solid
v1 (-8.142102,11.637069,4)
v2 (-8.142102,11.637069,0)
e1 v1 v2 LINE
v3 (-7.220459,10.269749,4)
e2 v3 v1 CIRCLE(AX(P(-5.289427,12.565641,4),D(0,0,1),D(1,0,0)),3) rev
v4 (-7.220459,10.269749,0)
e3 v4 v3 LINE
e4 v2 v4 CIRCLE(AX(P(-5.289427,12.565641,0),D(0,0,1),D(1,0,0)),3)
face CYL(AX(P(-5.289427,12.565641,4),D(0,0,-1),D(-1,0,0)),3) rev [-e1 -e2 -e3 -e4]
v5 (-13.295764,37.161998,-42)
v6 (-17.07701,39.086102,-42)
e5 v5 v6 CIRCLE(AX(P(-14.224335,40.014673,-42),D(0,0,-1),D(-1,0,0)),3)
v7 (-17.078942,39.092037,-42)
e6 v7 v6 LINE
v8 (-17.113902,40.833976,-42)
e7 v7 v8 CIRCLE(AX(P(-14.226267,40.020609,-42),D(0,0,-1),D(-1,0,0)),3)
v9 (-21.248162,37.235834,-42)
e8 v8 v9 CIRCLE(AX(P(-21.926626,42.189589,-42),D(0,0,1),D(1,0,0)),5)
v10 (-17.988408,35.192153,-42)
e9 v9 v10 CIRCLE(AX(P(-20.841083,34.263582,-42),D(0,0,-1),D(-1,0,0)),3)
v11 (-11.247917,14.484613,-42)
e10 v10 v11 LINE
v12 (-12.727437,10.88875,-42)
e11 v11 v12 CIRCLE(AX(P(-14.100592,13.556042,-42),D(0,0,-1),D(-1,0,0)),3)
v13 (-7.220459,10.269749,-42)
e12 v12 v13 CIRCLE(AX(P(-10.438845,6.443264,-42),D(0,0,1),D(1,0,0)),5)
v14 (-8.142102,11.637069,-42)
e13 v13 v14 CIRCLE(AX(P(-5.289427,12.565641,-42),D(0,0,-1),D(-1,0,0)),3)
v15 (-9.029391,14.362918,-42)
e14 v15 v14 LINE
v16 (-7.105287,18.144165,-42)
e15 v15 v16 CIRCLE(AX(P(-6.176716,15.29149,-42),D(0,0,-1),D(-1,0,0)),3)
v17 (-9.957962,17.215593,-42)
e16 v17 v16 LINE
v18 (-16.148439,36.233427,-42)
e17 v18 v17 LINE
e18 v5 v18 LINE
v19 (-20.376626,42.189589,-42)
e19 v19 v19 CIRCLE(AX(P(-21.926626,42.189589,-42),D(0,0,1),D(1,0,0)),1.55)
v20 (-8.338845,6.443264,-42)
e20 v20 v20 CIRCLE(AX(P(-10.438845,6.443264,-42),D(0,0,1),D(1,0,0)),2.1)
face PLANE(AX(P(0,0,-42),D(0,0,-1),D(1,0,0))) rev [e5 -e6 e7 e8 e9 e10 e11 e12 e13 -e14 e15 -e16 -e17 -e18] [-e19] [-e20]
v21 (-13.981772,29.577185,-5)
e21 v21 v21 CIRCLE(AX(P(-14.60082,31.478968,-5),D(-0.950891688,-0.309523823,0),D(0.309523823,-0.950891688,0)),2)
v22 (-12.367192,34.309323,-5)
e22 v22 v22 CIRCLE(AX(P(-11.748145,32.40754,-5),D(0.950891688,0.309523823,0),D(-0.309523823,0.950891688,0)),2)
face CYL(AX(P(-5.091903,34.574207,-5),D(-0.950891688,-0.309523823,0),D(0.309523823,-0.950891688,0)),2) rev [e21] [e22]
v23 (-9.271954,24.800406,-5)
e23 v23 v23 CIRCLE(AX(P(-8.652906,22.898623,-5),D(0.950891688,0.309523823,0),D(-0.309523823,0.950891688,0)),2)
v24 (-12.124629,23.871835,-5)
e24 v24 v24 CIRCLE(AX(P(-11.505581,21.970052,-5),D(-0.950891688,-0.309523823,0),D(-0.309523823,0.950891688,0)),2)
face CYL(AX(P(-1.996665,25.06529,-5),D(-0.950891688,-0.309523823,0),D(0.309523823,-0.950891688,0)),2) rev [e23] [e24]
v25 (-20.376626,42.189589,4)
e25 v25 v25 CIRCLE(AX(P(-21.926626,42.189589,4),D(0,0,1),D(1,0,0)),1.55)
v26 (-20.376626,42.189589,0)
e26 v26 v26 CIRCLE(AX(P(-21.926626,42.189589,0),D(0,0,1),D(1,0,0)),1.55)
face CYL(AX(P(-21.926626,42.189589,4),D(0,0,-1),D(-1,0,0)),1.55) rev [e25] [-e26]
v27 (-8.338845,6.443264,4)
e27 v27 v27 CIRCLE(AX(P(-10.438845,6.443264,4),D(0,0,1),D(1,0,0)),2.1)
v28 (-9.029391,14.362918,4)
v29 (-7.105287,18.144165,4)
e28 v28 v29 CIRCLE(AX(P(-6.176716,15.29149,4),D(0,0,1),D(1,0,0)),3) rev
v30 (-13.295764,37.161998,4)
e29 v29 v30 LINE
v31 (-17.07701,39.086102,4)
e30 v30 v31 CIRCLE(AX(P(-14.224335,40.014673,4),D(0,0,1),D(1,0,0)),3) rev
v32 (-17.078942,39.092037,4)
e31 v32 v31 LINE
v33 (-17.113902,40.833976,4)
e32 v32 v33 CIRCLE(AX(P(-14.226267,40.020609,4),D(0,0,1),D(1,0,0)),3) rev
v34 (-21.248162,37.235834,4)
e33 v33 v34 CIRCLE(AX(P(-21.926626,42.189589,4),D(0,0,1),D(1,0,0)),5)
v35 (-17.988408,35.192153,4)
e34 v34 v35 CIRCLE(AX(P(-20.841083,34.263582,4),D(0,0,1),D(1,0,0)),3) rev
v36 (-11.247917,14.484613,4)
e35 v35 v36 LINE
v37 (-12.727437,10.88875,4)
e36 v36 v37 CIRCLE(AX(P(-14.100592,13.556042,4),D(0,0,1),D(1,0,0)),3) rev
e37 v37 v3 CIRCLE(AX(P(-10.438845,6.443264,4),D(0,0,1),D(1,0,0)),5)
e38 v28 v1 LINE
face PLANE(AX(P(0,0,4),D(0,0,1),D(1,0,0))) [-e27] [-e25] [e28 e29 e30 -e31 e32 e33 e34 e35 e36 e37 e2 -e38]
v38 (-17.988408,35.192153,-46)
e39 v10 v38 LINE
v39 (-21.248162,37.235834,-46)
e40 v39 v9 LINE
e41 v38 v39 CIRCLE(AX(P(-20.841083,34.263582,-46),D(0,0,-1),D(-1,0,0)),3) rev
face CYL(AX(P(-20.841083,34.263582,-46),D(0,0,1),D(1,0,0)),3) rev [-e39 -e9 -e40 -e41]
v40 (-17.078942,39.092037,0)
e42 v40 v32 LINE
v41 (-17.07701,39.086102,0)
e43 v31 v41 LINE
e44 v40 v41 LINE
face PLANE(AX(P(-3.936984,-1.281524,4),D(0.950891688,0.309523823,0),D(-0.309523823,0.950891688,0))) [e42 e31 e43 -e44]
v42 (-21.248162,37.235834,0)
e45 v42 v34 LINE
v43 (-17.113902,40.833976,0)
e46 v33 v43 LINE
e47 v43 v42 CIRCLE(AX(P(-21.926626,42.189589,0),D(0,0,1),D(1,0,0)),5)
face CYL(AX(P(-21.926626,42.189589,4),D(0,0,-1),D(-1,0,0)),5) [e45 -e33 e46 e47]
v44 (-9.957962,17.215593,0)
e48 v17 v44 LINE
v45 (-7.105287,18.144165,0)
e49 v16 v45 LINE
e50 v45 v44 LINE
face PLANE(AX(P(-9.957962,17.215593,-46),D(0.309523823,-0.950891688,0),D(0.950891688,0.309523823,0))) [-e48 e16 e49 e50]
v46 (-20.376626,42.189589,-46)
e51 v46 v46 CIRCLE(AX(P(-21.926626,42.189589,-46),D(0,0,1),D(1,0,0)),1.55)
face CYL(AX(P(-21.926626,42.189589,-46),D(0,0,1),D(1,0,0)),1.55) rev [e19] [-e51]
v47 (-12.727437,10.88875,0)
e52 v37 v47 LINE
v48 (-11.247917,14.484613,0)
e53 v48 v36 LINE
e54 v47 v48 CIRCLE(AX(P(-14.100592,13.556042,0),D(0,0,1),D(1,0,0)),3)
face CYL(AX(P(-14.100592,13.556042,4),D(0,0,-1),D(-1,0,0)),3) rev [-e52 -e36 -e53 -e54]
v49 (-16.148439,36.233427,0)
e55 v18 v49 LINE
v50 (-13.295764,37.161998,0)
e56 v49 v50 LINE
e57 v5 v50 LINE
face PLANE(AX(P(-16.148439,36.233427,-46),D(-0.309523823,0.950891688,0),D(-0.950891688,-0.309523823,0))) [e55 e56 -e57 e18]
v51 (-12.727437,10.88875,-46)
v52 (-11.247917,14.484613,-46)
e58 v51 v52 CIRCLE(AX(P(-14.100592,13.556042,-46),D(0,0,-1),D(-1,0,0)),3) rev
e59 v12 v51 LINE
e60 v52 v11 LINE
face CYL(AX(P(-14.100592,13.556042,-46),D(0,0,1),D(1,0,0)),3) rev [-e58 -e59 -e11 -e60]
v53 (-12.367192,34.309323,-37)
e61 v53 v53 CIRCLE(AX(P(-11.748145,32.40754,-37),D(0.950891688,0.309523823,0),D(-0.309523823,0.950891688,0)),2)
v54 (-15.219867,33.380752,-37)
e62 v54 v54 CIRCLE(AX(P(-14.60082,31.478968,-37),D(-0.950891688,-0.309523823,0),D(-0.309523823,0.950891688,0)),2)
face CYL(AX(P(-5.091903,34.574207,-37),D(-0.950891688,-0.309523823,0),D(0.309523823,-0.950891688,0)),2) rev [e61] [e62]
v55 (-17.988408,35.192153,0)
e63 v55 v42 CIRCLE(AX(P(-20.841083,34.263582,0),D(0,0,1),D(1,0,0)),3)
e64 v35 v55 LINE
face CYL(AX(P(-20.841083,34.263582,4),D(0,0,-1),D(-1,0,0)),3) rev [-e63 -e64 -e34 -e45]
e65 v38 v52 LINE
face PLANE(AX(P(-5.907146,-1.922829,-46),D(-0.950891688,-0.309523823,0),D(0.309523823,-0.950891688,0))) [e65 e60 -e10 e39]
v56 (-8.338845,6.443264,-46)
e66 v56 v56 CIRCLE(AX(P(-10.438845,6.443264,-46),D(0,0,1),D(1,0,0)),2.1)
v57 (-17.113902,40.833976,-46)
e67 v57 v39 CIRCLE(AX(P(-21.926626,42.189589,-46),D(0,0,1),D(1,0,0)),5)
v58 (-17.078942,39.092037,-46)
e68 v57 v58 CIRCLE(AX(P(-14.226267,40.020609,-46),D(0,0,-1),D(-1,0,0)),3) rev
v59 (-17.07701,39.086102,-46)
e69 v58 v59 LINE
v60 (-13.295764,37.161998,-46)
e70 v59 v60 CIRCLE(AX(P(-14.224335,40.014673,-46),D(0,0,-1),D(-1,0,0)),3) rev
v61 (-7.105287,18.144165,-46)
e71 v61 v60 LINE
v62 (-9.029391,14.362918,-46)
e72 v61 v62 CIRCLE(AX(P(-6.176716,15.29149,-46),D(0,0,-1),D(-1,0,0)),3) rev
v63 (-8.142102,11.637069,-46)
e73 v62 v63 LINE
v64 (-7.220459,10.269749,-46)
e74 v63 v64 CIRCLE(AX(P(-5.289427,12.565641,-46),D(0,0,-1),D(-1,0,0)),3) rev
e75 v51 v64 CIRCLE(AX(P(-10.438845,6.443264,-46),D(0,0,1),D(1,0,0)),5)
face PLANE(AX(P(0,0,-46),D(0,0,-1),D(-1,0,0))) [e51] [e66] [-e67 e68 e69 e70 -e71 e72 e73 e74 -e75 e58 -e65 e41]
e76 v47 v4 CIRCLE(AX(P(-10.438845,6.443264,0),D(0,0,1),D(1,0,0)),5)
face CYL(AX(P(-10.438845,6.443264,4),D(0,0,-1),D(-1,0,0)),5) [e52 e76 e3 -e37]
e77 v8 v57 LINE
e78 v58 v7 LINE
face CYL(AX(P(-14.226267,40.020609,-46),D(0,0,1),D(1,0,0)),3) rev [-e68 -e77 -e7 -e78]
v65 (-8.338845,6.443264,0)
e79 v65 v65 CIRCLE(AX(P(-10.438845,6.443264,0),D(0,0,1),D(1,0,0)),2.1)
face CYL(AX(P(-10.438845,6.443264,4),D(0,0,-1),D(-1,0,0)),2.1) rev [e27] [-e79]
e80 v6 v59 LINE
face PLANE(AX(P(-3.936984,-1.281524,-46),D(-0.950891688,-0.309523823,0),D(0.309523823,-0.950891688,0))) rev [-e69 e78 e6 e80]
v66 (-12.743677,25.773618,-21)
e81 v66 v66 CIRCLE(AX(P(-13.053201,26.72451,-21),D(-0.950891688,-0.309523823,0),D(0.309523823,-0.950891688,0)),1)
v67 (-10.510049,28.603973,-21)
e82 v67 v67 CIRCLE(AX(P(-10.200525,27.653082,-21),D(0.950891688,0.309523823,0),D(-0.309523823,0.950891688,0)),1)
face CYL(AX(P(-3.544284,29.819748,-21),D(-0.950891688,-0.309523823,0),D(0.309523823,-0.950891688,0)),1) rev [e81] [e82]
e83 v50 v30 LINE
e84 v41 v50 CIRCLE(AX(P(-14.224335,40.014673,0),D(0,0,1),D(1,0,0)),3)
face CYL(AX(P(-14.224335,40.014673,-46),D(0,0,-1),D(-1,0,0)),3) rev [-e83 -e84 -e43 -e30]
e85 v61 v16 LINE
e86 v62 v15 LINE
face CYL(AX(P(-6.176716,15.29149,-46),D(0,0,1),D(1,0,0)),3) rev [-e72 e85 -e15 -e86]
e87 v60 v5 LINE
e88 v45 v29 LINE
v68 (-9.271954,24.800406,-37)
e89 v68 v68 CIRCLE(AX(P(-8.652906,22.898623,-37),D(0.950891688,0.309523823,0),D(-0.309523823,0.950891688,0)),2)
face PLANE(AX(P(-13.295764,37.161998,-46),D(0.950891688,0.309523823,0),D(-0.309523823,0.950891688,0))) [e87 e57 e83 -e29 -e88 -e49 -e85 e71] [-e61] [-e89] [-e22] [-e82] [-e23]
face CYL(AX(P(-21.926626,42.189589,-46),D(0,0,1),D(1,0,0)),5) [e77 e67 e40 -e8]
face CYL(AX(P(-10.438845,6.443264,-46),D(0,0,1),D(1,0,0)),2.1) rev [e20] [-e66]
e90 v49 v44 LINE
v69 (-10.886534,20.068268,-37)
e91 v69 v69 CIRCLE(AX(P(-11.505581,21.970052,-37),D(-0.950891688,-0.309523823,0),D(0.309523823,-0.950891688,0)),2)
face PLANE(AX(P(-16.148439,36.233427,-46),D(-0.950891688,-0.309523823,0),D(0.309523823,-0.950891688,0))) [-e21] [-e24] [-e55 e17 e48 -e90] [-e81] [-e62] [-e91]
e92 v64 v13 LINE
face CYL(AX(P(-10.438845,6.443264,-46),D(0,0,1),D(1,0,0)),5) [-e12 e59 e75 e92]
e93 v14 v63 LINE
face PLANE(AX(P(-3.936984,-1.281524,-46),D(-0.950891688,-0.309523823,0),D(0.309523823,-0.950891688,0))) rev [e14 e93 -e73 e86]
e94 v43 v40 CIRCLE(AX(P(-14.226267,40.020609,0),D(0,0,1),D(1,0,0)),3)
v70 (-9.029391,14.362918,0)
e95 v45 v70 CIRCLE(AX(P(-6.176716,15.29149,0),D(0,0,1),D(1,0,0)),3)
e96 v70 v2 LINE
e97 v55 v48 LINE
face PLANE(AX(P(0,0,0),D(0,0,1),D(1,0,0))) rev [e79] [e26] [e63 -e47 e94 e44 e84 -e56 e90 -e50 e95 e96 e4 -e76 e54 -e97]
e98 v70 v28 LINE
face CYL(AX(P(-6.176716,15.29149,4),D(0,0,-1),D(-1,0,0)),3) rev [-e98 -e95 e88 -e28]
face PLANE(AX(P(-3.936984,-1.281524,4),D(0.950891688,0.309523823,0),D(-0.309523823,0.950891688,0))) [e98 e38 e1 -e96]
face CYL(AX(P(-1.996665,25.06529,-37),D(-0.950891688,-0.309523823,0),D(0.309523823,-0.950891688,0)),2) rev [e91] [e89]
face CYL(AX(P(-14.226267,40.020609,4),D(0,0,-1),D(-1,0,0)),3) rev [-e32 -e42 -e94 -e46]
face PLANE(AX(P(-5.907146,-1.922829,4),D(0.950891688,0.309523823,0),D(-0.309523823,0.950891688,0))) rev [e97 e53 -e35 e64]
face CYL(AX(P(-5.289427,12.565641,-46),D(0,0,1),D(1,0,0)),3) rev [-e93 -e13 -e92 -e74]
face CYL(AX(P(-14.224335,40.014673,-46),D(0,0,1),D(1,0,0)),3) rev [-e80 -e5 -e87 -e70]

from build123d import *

# Parameters (mm, degrees)
SKETCH1_R           = 2.1
SKETCH1_R_2         = 1.55
BOSS_EXTRUDE1_DEPTH = 4
BOSS_EXTRUDE2_DEPTH = 50
SKETCH3_R           = 2
SKETCH3_R_2         = 1
CUT_EXTRUDE1_DEPTH  = 10
FILLET1_R           = 3


with BuildPart() as part:
    # Sketch1 → Boss-Extrude1 (new body)
    with BuildSketch(Plane.XY):
        with BuildLine():
            Line((-7.842362425, 10.716234493), (-17.397624454, 40.071064625))
            ThreePointArc((-17.397624454, 40.071064625), (-25.795005306, 45.357497095), (-18.956793202, 38.167140452))
            Line((-18.956793202, 38.167140452), (-18.754238897, 37.544871045))
            Line((-18.754238897, 37.544871045), (-10.63810017, 12.611188123))
            Line((-10.63810017, 12.611188123), (-10.256851829, 11.439950722))
            ThreePointArc((-10.256851829, 11.439950722), (-11.874437039, 1.653788416), (-7.842362425, 10.716234493))
        make_face()
        with Locations((-10.438845238, 6.44326398)):
            Circle(SKETCH1_R, mode=Mode.SUBTRACT)
        with Locations((-21.926625837, 42.189589224)):
            Circle(SKETCH1_R_2, mode=Mode.SUBTRACT)
    boss_extrude1 = extrude(amount=BOSS_EXTRUDE1_DEPTH)

    # Sketch2 → Boss-Extrude2 (add)
    with BuildSketch(Plane.XY.offset(4)):
        Polygon((-16.14843876, 36.233426921), (-9.957962302, 17.215593153), (-7.105287237, 18.144164622), (-13.295763695, 37.161998389), align=None)
    extrude(amount=-BOSS_EXTRUDE2_DEPTH)

    # Mirror1: Boss-Extrude1 across plane
    add(boss_extrude1.mirror(Plane.XY.offset(-21)))

    # Sketch3 → Cut-Extrude1 (cut)
    with BuildSketch(Plane(origin=(-3.936983875, -1.281523768, 0), x_dir=(0, 0, 1), z_dir=(-0.950891688393093, -0.30952382290371966, 0))):
        with Locations(Location((-5, 34.452391, 0), (0, 0, 270))):
            Circle(SKETCH3_R)
        with Locations(Location((-5, 24.452391, 0), (0, 0, 90))):
            Circle(SKETCH3_R)
        with Locations(Location((-37, 24.452391, 0), (0, 0, 270))):
            Circle(SKETCH3_R)
        with Locations(Location((-37, 34.452391, 0), (0, 0, 90))):
            Circle(SKETCH3_R)
        with Locations(Location((-21, 29.452391, 0), (0, 0, 270))):
            Circle(SKETCH3_R_2)
    extrude(amount=-CUT_EXTRUDE1_DEPTH, mode=Mode.SUBTRACT)

    # Fillet1
    fillet1_edges = [part.edges().sort_by_distance(p)[0] for p in [
        (-9.957962302, 17.215593153, 2),
        (-9.957962302, 17.215593153, -44),
        (-16.14843876, 36.233426921, -44),
        (-16.14843876, 36.233426921, 2),
        (-10.256851829, 11.439950722, 2),
        (-7.842362425, 10.716234493, 2),
        (-7.842362425, 10.716234493, -44),
        (-10.256851829, 11.439950722, -44),
        (-17.397624454, 40.071064625, -44),
        (-18.956793202, 38.167140452, -44),
        (-17.397624454, 40.071064625, 2),
        (-18.956793202, 38.167140452, 2),
    ]]
    fillet(fillet1_edges, radius=FILLET1_R - 0.0001)  # a hair under: the kernel refuses the full size


solid = part.part
